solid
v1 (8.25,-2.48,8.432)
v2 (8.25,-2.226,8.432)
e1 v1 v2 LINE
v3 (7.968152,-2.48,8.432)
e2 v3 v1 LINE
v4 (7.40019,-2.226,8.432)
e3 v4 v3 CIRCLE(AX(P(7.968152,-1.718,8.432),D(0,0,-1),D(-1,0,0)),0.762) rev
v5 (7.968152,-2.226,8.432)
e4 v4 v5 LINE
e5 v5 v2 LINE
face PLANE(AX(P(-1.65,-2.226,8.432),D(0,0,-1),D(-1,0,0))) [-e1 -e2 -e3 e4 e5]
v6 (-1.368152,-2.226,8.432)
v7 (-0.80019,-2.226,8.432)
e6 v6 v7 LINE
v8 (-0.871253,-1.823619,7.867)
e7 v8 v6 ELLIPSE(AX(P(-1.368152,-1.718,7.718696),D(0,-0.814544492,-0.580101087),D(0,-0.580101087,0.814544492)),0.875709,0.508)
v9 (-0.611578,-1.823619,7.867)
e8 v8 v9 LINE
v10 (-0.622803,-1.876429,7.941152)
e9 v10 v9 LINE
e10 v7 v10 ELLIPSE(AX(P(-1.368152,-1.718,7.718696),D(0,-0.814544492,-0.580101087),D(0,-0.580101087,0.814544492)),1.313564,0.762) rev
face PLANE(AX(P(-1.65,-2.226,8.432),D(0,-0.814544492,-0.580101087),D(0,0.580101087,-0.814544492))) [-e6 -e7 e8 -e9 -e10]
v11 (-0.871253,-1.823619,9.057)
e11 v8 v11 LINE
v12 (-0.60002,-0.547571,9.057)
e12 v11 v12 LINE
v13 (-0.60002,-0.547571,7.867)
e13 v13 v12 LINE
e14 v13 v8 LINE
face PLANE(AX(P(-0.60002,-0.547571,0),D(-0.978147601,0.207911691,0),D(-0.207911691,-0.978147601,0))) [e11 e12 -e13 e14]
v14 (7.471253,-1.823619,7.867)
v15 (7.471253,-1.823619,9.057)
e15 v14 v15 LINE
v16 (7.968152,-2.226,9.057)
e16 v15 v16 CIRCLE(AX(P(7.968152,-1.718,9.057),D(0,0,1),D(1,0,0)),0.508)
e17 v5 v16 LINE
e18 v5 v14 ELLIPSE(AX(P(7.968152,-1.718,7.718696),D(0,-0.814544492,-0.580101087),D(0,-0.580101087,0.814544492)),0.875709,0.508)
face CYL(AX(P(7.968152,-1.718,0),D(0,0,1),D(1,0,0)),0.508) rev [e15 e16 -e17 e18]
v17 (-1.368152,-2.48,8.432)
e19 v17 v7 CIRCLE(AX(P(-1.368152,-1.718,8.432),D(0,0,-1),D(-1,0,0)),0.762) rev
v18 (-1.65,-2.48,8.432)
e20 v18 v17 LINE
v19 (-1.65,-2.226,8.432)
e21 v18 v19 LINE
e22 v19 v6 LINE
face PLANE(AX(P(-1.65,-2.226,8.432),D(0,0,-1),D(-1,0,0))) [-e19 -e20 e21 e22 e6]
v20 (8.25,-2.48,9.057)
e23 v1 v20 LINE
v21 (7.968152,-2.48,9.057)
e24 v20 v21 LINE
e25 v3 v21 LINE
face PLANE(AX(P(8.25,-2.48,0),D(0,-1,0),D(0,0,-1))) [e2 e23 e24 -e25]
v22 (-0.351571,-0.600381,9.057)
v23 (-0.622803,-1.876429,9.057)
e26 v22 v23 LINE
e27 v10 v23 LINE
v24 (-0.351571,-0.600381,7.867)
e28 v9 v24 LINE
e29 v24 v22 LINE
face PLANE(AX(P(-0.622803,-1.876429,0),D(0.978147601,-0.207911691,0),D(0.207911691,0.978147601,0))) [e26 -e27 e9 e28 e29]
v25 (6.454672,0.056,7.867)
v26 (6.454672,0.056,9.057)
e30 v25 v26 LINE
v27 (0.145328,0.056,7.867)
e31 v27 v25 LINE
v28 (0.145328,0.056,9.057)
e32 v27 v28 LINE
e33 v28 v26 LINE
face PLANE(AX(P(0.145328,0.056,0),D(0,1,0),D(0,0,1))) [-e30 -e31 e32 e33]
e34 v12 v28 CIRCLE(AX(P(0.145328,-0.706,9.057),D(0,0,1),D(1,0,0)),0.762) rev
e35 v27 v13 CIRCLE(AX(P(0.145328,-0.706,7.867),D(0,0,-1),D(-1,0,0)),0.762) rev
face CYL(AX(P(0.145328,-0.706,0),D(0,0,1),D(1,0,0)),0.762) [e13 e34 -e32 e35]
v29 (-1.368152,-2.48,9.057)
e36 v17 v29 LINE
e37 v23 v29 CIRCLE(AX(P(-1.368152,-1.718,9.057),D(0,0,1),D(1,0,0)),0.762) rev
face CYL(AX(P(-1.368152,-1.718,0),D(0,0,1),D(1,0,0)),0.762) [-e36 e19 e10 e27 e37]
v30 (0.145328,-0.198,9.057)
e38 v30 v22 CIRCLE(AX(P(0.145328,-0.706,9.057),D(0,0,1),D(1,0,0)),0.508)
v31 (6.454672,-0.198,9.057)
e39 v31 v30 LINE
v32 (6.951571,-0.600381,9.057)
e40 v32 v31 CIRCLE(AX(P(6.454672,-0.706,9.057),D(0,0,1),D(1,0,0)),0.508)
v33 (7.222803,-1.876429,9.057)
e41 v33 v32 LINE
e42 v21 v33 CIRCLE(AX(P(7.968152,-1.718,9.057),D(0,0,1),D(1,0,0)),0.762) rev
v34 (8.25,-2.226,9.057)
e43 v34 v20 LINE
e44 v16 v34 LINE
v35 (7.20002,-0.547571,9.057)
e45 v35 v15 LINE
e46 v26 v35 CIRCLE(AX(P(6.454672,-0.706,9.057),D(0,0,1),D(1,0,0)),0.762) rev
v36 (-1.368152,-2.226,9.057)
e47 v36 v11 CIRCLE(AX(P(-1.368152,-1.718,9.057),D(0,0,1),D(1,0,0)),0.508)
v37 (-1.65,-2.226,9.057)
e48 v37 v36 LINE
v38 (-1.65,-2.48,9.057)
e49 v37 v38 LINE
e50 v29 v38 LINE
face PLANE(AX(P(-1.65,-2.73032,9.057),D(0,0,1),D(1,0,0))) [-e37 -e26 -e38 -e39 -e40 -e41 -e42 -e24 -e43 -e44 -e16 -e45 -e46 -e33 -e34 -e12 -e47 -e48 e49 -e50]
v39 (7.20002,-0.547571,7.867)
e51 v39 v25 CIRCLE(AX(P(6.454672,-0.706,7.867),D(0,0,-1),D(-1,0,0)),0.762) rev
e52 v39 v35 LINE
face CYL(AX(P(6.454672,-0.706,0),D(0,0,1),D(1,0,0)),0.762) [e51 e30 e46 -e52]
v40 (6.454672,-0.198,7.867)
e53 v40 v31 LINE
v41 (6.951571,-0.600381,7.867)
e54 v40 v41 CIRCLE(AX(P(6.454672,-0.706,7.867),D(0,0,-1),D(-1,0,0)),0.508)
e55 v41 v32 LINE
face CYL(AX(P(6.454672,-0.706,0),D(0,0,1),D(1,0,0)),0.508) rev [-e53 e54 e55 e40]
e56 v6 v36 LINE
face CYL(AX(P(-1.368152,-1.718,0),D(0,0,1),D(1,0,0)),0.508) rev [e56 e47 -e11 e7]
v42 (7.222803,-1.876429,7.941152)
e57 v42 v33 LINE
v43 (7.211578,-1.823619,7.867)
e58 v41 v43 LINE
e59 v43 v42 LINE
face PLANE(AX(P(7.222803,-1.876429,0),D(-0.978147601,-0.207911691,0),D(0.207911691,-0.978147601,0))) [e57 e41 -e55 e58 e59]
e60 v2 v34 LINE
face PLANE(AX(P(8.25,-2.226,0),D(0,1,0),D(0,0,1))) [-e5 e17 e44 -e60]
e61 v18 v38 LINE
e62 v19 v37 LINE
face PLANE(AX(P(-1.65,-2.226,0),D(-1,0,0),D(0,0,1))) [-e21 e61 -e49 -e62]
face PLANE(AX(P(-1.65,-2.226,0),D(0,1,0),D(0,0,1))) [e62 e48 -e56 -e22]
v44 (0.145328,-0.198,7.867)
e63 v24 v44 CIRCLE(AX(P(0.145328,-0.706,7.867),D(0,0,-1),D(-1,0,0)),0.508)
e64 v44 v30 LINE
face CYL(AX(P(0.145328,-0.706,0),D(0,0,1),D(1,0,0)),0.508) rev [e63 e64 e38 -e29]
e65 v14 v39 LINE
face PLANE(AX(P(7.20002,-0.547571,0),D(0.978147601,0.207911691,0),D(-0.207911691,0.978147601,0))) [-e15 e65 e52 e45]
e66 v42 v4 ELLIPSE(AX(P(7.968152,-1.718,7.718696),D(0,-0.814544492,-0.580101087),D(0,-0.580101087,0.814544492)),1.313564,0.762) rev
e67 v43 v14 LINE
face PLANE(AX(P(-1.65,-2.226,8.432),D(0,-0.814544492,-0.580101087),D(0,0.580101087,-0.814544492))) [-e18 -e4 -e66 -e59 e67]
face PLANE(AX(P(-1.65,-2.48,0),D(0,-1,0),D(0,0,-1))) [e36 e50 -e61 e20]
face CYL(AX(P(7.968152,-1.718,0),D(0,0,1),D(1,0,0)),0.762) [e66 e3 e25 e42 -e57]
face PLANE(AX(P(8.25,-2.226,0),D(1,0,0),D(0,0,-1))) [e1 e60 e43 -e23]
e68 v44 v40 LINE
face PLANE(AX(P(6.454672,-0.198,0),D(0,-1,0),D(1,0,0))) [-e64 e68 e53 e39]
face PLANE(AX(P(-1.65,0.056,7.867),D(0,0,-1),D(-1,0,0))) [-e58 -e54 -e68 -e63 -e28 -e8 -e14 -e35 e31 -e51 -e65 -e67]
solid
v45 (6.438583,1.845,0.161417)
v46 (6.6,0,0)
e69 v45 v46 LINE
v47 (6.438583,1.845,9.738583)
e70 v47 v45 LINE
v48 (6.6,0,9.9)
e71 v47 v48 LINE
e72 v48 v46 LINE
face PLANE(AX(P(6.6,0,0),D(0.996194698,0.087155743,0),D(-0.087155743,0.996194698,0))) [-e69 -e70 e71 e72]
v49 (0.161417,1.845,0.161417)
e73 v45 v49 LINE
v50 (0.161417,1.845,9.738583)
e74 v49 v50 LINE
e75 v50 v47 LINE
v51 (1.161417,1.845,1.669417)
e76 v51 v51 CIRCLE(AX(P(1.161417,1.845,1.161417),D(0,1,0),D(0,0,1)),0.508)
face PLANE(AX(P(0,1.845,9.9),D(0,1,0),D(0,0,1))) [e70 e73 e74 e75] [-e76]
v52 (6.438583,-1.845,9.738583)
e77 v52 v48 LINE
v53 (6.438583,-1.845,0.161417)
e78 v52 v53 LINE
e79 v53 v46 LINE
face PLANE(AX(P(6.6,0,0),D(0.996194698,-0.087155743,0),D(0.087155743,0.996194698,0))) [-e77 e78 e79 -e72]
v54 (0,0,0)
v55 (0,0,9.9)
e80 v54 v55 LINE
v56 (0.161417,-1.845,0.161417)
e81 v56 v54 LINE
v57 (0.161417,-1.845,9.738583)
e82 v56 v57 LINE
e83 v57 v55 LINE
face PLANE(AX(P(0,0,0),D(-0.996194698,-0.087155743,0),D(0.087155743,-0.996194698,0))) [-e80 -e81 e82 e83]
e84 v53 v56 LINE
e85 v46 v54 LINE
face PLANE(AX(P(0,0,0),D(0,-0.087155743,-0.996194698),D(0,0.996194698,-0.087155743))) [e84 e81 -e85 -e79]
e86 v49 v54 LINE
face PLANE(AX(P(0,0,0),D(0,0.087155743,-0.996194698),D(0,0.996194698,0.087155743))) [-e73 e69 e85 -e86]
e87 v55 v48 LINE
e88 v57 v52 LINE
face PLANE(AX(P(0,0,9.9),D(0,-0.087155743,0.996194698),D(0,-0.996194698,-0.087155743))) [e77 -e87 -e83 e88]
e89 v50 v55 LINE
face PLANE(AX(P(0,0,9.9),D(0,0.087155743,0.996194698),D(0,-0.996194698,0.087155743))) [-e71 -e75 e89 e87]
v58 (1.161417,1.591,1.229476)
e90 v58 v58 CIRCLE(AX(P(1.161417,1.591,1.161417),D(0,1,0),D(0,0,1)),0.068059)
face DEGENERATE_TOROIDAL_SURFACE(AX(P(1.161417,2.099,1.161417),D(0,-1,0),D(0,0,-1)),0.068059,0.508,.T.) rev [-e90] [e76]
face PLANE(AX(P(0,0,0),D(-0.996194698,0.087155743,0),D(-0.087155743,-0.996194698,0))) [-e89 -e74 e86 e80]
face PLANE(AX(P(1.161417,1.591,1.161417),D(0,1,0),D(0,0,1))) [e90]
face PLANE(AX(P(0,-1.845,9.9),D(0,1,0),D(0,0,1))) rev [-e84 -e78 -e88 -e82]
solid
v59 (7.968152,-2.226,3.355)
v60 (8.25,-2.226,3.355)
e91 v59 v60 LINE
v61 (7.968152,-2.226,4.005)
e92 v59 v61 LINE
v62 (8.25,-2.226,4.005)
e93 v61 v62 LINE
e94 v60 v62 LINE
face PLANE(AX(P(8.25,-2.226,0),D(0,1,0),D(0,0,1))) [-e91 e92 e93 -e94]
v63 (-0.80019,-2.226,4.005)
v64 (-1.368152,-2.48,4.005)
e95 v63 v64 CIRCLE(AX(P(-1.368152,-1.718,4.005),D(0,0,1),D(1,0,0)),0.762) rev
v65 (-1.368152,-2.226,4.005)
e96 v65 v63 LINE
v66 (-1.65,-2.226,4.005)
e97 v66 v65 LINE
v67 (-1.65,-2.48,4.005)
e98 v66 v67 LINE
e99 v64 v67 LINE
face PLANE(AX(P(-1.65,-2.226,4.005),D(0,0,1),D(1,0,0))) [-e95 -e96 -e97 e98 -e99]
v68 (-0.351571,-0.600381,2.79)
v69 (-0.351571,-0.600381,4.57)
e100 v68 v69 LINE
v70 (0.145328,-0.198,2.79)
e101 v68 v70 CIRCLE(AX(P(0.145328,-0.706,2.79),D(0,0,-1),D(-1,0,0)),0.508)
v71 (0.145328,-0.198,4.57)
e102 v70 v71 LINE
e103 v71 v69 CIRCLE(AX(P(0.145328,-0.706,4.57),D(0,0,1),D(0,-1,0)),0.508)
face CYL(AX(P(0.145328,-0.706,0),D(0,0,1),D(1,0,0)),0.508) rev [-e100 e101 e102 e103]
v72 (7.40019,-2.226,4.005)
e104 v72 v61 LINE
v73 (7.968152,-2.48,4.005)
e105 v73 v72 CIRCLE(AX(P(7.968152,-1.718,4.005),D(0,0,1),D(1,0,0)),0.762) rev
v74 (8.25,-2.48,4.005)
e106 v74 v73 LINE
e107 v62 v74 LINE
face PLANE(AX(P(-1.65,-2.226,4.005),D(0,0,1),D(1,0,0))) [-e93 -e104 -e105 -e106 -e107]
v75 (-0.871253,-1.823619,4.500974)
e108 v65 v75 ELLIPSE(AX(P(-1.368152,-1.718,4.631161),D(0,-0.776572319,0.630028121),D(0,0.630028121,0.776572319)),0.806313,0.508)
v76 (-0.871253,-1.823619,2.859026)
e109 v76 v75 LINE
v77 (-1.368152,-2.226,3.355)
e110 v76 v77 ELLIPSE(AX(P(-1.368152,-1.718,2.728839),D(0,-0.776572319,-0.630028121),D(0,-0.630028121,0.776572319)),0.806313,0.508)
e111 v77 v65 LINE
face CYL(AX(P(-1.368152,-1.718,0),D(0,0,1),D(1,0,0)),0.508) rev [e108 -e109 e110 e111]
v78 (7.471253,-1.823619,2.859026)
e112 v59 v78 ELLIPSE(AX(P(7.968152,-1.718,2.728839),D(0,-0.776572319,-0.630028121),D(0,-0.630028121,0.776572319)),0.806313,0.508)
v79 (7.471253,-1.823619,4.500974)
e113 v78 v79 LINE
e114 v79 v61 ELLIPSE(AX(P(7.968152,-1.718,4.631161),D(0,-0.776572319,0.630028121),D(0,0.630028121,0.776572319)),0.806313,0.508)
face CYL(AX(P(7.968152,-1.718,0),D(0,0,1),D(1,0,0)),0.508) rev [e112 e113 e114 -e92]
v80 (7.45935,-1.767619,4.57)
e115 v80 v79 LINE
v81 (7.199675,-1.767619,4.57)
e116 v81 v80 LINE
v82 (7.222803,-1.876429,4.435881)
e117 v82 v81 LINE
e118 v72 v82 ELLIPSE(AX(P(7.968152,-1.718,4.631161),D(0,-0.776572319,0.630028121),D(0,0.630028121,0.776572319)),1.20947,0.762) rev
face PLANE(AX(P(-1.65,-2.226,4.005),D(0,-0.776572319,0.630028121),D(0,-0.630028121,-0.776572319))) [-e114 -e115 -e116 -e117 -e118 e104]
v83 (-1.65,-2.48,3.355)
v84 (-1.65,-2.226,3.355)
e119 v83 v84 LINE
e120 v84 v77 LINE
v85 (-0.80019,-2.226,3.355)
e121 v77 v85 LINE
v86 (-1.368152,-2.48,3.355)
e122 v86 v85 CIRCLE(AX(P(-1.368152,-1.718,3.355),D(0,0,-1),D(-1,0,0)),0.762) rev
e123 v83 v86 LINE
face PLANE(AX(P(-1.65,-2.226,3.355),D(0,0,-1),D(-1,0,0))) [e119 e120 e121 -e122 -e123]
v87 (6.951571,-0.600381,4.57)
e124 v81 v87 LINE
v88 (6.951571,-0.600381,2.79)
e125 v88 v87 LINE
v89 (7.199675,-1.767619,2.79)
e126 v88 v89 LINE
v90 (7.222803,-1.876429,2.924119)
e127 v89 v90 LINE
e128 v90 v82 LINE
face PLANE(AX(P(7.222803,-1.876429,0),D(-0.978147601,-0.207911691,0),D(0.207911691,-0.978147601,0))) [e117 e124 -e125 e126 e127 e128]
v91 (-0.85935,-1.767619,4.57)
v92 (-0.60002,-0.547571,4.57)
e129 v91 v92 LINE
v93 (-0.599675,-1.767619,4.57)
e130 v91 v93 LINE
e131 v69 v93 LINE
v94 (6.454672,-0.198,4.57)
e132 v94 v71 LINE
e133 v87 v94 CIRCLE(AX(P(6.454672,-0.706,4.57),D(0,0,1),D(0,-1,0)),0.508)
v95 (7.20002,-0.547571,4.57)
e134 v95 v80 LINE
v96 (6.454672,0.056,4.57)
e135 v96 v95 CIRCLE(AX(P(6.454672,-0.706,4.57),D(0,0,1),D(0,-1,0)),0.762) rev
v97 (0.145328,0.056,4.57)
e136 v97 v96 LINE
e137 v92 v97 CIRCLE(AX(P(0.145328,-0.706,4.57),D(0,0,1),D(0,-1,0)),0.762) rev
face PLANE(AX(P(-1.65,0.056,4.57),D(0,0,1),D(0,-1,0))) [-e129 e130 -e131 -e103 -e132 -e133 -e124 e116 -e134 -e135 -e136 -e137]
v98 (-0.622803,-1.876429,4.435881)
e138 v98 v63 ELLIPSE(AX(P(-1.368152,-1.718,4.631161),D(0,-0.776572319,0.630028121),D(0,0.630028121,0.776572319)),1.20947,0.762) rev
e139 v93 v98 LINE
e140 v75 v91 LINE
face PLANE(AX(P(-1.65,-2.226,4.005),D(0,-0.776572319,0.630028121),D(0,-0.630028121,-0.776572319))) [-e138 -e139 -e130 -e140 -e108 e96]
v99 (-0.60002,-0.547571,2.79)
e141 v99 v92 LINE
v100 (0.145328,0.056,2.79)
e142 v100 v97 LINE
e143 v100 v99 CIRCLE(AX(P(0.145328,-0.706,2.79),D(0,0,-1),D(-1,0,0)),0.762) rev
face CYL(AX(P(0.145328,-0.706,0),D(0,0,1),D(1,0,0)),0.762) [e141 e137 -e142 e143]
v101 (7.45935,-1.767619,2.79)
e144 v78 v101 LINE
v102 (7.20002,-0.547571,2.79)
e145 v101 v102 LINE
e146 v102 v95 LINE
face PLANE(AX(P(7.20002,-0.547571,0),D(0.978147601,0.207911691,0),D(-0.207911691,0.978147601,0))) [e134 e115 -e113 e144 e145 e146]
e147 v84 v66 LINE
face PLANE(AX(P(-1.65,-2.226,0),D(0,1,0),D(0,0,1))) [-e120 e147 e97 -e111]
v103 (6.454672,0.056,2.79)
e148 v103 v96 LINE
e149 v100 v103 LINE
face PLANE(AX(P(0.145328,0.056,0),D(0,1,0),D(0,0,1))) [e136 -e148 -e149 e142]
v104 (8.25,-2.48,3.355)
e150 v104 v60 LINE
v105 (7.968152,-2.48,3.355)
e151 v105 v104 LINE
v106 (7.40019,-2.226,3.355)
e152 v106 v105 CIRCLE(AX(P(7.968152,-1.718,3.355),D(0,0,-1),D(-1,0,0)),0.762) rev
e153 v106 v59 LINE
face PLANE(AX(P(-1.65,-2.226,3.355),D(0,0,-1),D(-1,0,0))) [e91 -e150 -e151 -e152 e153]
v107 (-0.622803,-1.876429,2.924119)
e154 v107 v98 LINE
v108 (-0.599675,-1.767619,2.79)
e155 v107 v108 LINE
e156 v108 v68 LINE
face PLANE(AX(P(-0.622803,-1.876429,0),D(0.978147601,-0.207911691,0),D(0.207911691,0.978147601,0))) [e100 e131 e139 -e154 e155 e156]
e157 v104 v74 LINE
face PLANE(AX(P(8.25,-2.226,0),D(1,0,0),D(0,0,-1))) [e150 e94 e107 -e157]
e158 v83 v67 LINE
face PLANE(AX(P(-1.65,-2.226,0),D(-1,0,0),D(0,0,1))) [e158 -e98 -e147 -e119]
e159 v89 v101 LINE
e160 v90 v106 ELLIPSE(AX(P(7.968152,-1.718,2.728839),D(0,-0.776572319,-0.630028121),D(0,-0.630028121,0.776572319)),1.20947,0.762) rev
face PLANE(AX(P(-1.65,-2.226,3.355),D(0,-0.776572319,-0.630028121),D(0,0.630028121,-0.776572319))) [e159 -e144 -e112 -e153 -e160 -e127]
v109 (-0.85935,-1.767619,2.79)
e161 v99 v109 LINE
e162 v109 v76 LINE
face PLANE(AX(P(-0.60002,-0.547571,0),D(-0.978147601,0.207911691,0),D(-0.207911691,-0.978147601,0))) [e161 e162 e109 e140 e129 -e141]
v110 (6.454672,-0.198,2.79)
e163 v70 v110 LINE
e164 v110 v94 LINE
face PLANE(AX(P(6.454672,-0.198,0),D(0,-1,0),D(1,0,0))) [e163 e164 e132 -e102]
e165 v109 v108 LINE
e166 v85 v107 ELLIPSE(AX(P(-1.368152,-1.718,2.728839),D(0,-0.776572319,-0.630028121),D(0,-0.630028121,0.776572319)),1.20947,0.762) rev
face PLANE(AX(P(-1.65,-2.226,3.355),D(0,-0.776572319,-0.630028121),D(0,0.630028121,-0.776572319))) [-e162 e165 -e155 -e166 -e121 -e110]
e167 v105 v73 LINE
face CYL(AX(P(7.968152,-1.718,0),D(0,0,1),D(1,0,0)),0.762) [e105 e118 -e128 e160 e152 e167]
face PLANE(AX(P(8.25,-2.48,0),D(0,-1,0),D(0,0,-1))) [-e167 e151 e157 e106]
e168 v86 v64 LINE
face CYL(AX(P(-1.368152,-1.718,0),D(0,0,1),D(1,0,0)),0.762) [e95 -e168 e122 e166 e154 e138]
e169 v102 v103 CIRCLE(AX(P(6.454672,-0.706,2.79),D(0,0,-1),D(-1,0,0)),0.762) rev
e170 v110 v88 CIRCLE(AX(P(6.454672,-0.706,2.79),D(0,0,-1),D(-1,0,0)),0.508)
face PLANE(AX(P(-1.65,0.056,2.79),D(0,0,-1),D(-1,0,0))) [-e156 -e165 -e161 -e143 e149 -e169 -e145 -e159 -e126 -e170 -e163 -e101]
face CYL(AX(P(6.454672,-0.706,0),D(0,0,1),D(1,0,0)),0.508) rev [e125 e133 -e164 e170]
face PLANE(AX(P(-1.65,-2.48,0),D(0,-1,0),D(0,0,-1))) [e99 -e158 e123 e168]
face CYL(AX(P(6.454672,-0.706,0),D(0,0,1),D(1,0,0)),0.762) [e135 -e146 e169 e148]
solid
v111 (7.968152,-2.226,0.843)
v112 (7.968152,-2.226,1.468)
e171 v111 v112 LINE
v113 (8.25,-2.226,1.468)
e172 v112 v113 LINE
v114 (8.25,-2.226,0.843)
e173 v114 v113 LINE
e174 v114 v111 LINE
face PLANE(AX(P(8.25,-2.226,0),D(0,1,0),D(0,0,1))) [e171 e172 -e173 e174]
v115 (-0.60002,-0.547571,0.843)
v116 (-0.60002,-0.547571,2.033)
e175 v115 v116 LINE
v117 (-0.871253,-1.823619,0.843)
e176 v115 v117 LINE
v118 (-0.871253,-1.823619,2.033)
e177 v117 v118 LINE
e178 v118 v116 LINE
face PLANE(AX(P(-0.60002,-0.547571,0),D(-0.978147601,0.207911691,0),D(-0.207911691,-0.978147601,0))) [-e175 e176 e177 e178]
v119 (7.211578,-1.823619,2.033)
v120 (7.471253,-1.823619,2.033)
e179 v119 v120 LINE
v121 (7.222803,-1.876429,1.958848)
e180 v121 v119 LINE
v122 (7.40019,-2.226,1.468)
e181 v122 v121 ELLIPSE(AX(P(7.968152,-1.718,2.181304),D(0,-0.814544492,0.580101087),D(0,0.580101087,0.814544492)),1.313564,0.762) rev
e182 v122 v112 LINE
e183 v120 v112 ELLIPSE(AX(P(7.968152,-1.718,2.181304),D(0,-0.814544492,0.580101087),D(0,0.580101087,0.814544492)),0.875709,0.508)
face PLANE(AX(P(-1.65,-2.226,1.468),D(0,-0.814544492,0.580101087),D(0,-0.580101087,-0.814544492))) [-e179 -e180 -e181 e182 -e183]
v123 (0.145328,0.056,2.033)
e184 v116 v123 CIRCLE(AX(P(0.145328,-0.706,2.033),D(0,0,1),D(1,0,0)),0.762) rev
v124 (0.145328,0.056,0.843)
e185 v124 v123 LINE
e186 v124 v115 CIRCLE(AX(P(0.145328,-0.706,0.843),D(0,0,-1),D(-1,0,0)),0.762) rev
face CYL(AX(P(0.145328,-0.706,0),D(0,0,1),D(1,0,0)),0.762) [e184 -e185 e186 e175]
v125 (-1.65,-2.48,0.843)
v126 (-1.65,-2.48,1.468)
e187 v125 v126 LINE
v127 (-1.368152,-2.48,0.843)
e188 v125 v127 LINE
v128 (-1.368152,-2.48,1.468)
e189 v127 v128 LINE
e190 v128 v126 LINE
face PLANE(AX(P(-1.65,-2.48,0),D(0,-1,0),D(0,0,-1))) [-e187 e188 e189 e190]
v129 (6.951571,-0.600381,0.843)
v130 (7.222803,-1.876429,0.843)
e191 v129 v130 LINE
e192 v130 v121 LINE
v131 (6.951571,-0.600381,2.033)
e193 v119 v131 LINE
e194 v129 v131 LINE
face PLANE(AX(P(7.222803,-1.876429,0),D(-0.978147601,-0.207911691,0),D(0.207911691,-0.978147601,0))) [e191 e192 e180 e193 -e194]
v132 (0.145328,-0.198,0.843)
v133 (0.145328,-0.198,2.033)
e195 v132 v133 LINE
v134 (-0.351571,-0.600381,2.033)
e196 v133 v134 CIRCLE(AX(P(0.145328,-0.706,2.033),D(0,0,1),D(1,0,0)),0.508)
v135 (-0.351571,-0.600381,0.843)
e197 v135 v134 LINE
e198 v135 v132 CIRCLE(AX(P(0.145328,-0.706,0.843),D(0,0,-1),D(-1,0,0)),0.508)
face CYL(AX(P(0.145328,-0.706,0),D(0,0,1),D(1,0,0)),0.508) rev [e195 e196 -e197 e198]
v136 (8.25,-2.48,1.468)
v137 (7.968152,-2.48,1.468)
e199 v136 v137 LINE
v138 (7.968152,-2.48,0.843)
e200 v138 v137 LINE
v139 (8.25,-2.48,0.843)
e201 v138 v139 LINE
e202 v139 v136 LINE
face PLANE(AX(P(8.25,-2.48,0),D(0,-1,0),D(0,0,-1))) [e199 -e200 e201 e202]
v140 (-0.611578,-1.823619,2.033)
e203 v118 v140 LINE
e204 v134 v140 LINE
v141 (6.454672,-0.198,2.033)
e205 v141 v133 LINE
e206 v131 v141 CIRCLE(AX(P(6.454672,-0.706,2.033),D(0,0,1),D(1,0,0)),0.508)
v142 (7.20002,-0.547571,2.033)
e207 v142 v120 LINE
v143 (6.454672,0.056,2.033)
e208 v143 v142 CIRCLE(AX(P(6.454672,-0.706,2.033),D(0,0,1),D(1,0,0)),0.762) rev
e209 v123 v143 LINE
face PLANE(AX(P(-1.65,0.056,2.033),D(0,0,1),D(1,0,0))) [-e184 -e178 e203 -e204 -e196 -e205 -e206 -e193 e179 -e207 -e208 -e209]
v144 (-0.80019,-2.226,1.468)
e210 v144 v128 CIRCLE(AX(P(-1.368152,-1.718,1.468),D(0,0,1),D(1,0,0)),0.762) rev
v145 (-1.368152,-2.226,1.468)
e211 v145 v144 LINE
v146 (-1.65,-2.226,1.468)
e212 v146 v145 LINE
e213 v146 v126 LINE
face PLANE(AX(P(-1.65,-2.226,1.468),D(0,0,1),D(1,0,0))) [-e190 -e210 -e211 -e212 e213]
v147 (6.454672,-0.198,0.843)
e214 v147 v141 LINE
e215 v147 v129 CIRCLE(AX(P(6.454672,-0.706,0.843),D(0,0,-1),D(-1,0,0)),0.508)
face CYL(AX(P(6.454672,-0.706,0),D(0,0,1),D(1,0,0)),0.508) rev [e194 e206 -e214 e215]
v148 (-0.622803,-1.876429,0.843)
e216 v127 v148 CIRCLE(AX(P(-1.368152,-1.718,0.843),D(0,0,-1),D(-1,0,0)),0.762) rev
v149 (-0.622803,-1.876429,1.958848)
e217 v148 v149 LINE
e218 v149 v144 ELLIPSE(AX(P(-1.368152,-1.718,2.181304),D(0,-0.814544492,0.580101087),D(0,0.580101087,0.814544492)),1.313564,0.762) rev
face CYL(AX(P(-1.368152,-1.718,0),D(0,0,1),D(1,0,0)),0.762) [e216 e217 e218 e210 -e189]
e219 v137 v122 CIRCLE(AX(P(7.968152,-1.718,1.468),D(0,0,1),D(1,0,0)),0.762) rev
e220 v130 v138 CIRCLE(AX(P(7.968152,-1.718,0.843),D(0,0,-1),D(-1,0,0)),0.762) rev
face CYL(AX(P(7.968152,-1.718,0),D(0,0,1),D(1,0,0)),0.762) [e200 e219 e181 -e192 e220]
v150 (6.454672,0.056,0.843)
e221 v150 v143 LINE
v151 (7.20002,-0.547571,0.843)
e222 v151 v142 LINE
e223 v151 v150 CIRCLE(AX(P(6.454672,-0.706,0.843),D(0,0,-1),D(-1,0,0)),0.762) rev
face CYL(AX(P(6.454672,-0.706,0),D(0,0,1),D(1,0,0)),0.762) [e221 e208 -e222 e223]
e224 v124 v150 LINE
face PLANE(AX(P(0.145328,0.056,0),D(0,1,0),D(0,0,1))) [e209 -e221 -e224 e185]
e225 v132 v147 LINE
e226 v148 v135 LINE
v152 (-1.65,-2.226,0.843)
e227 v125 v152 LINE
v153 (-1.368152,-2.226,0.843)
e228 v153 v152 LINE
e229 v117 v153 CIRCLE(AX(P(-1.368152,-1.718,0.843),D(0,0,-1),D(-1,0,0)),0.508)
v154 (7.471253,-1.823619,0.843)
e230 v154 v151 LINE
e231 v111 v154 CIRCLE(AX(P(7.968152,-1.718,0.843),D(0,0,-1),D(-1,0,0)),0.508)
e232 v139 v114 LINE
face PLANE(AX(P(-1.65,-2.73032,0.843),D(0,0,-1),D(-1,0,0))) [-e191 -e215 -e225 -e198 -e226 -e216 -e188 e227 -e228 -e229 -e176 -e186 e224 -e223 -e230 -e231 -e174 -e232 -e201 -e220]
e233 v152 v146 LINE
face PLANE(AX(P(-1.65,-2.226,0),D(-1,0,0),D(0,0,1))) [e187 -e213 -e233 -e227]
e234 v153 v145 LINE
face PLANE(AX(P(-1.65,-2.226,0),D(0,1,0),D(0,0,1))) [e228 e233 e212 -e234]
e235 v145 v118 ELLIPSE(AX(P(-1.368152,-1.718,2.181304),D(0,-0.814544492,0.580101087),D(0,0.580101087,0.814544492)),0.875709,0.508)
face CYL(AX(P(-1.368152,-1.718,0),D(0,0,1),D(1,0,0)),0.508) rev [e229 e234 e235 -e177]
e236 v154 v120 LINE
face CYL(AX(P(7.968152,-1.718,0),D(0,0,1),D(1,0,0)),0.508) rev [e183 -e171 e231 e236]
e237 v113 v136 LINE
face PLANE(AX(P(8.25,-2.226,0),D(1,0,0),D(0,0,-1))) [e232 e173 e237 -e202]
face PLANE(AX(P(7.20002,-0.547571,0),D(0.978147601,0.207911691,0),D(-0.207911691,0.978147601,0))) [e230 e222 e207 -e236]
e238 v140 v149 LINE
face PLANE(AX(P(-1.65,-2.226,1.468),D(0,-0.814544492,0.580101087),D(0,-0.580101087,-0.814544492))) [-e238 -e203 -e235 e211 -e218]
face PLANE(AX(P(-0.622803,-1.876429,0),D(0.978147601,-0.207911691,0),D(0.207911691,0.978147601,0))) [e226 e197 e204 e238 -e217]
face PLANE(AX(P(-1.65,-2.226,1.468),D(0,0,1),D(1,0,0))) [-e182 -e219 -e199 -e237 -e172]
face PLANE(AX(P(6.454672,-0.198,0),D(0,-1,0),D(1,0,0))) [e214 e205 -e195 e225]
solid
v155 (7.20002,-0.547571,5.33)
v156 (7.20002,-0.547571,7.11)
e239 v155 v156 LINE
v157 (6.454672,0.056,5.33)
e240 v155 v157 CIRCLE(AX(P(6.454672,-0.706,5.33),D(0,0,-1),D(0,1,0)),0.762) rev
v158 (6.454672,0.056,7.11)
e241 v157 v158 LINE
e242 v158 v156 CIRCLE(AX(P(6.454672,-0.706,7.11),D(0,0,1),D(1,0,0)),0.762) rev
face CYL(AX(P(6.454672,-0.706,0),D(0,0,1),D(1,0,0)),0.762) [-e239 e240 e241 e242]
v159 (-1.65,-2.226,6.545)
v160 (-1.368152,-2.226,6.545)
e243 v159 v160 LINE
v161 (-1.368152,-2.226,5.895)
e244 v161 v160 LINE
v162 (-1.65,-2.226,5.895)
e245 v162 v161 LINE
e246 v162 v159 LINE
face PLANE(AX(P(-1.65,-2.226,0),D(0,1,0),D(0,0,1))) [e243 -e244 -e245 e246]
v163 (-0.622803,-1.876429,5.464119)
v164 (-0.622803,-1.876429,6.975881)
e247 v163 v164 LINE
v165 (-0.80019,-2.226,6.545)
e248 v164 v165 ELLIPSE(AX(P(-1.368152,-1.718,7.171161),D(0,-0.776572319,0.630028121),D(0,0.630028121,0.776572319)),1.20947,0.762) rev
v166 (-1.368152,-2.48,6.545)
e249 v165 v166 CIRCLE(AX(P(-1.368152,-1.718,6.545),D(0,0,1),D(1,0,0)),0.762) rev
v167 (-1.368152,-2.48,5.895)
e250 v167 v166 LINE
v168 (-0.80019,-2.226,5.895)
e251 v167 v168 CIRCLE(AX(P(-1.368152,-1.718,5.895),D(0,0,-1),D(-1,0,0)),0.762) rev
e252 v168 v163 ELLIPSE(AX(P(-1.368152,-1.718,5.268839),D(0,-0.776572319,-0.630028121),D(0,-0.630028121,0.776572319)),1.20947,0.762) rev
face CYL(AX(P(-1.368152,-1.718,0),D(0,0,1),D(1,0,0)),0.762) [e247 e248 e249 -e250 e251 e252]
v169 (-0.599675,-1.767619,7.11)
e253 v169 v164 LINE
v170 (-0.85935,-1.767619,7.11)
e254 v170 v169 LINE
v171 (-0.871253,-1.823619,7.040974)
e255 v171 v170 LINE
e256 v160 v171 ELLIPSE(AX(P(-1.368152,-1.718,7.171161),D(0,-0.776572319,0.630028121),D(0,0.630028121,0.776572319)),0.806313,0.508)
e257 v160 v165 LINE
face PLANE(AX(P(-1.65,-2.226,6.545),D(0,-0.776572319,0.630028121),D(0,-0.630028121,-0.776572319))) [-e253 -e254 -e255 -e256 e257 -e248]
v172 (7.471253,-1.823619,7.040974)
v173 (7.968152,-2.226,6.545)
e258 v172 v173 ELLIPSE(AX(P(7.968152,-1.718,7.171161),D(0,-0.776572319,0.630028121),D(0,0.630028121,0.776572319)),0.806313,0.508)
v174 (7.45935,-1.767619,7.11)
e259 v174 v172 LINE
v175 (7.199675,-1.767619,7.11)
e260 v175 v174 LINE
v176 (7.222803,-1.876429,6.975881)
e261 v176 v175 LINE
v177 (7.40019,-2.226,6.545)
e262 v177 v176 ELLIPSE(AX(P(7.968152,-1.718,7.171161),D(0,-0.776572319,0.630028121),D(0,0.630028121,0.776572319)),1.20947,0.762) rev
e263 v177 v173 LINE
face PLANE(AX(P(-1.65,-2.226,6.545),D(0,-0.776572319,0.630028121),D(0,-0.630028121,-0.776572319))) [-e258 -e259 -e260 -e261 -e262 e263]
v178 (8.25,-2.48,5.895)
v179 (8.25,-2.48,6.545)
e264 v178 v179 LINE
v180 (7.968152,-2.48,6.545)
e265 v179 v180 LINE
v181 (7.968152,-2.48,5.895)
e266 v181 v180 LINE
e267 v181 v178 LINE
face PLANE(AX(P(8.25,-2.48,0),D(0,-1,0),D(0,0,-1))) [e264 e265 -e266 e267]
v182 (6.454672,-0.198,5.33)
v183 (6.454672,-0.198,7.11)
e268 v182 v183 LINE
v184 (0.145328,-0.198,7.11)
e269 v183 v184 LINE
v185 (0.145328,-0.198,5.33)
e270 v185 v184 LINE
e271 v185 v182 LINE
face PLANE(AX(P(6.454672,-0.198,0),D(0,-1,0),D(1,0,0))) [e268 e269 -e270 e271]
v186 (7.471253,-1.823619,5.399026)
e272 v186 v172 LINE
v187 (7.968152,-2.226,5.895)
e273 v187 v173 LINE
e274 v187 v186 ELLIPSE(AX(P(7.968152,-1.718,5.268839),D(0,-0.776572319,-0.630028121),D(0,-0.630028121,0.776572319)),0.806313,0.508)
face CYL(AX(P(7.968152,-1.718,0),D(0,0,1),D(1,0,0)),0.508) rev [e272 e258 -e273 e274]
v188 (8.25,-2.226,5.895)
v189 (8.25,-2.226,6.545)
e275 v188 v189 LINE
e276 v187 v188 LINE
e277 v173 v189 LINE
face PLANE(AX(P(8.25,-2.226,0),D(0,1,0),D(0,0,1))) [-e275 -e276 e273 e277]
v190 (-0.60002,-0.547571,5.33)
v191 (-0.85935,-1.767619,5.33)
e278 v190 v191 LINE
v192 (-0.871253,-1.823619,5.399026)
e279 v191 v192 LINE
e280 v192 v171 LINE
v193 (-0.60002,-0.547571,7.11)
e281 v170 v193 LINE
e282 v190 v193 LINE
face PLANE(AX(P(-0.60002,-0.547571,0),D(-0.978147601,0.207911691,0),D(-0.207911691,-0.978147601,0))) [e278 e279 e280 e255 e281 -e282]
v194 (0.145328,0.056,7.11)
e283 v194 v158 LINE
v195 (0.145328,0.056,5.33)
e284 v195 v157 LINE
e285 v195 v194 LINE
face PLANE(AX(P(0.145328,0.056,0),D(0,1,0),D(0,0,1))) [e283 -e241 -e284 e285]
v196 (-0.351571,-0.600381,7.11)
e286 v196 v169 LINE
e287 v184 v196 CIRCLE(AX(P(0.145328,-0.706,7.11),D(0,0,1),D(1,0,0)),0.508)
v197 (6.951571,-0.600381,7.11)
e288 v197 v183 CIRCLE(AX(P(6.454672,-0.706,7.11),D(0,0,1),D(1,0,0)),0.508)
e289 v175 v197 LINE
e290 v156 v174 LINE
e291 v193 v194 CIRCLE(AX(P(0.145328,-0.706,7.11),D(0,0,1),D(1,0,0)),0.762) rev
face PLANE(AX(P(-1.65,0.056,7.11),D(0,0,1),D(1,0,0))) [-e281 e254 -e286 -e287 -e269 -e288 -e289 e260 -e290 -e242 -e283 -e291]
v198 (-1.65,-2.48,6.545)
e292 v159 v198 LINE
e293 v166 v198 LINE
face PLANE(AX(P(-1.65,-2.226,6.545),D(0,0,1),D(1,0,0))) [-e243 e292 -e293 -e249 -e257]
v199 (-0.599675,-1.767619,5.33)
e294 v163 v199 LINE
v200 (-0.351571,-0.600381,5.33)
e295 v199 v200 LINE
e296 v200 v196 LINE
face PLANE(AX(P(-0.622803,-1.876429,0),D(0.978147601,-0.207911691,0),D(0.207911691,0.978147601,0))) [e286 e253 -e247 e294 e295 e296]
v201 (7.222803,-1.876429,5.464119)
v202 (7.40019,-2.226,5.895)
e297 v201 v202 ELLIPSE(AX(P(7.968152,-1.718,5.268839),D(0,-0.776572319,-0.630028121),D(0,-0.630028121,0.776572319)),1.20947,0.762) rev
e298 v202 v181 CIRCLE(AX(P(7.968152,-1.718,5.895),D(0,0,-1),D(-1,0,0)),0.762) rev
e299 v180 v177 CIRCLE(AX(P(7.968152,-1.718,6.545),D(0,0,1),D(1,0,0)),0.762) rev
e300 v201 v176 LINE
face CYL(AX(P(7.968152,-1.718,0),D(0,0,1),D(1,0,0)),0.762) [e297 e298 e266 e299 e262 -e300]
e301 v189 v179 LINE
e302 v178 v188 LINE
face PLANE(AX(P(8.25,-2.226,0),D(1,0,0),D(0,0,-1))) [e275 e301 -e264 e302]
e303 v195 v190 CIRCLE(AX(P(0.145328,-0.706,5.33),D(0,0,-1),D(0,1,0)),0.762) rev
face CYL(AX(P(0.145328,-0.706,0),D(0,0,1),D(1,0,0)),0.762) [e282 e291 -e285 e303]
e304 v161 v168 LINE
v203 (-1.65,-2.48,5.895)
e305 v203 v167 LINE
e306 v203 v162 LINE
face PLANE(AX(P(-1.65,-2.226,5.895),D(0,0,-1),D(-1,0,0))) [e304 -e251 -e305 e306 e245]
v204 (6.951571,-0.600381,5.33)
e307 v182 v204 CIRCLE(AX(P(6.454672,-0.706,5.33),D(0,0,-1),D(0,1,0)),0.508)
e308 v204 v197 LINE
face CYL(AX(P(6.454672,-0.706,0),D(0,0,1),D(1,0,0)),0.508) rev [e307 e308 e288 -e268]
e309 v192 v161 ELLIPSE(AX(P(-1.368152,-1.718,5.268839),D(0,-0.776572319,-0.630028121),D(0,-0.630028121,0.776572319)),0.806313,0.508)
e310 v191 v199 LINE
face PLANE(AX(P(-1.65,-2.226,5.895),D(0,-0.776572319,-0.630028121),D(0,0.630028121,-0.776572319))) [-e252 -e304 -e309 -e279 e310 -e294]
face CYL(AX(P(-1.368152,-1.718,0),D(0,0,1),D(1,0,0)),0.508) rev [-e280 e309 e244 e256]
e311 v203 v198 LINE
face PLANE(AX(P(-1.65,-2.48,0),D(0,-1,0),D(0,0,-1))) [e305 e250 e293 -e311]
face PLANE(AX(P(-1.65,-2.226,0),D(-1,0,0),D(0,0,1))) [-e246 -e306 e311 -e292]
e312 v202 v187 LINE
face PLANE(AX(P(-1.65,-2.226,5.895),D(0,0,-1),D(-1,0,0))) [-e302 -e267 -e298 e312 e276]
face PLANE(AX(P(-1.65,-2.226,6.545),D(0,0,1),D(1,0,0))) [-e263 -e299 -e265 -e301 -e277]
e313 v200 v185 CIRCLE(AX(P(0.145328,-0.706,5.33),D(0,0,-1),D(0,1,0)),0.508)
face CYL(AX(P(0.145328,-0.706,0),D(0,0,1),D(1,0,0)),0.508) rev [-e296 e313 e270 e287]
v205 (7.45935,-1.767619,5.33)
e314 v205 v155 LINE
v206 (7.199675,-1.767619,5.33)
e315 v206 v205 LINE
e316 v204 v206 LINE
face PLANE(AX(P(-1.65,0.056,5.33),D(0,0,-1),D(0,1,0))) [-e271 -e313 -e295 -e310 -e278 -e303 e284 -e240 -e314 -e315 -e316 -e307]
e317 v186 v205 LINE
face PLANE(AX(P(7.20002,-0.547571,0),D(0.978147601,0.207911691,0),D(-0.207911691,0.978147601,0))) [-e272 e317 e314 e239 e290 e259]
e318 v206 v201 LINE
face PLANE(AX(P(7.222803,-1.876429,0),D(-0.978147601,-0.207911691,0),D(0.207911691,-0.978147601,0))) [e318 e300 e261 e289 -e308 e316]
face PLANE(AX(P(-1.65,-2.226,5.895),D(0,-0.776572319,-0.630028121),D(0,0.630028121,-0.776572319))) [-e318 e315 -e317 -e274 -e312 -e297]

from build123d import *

# Parameters (mm, degrees)
SKETCH1_W                = 6.6
SKETCH1_H                = 9.9
EXTRUDE1_DEPTH           = 1.845
EXTRUDE1_TAPER           = 5
EXTRUDE1_OTHER_WAY_DEPTH = 1.845
EXTRUDE1_OTHER_WAY_TAPER = 5
EXTRUDE2_DEPTH           = 9.9
SKETCH4_W                = 14.472688398
SKETCH4_H                = 13.698747843
CUT_EXTRUDE1_DEPTH       = 15.218663861
SKETCH7_R                = 0.508
CUT_EXTRUDE4_DEPTH       = 0.254
FILLET1_R                = 0.508


with BuildPart() as part:
    # Sketch1 → Extrude1 (new body)
    with BuildSketch(Plane(origin=(0, 0, 0), x_dir=(1, 0, 0), z_dir=(0, 1, 0))):
        with Locations((3.3, -4.95)):
            Rectangle(SKETCH1_W, SKETCH1_H)
    extrude(amount=-EXTRUDE1_DEPTH, taper=EXTRUDE1_TAPER)

    # Sketch1 → Extrude1 other way (add)
    with BuildSketch(Plane(origin=(0, 0, 0), x_dir=(1, 0, 0), z_dir=(0, 1, 0))):
        with Locations((3.3, -4.95)):
            Rectangle(SKETCH1_W, SKETCH1_H)
    extrude(amount=EXTRUDE1_OTHER_WAY_DEPTH, taper=EXTRUDE1_OTHER_WAY_TAPER)

    # Sketch7 → Cut-Extrude4 (cut)
    with BuildSketch(Plane(origin=(0, 1.845, 0), x_dir=(1, 0, 0), z_dir=(0, 1, 0))):
        with Locations(Location((1.161416584, -1.161416584, 0), (0, 0, 270))):
            Circle(SKETCH7_R)
    extrude(amount=-CUT_EXTRUDE4_DEPTH, mode=Mode.SUBTRACT)

    # Fillet1
    # the kernel refuses this fillet: 0.508 mm, written as the material it adds along each edge
    with BuildSketch(Plane(origin=(1.161416584, 1.591, 1.161416584), x_dir=(0, 0, 1), z_dir=(-1, 0, 0))) as fillet1_piece_1:
        with BuildLine():
            CenterArc((0.068059095, 0.508), FILLET1_R, 270, 60)
            Line((0.068059095, 0), (0.068059095, -0.01016))
            Line((0.068059095, -0.01016), (0.508, -0.01016))
            Line((0.508, -0.01016), (0.51816, 0))
            ThreePointArc((0.51816, 0), (0.51816, 0.127), (0.516798818, 0.24892))
            Line((0.516798818, 0.24892), (0.508, 0.254))
        make_face()
    revolve(axis=Axis((1.161416584, 1.591, 1.161416584), (0, 1, 0)))


with BuildPart() as body_2:
    # Sketch2 → Extrude2 (new body)
    with BuildSketch(Plane(origin=(0, -0.430598518, 0), x_dir=(1, 0, 0), z_dir=(0, 0, 1))):
        with BuildLine():
            Line((0.145328065, 0.486598518), (6.454671935, 0.486598518))
            ThreePointArc((6.454671935, 0.486598518), (6.934214073, 0.316783741), (7.200020406, -0.116972773))
            Line((7.200020406, -0.116972773), (7.471252749, -1.393020621))
            ThreePointArc((7.471252749, -1.393020621), (7.648456972, -1.68219163), (7.968151731, -1.795401482))
            Line((7.968151731, -1.795401482), (8.25, -1.795401482))
            Line((8.25, -1.795401482), (8.25, -2.049401482))
            Line((8.25, -2.049401482), (7.968151731, -2.049401482))
            ThreePointArc((7.968151731, -2.049401482), (7.488609593, -1.879586704), (7.222803259, -1.44583019))
            Line((7.222803259, -1.44583019), (6.951570916, -0.169782343))
            ThreePointArc((6.951570916, -0.169782343), (6.774366693, 0.119388667), (6.454671935, 0.232598518))
            Line((6.454671935, 0.232598518), (0.145328065, 0.232598518))
            ThreePointArc((0.145328065, 0.232598518), (-0.174366693, 0.119388667), (-0.351570916, -0.169782343))
            Line((-0.351570916, -0.169782343), (-0.622803259, -1.44583019))
            ThreePointArc((-0.622803259, -1.44583019), (-0.888609593, -1.879586704), (-1.368151731, -2.049401482))
            Line((-1.368151731, -2.049401482), (-1.65, -2.049401482))
            Line((-1.65, -2.049401482), (-1.65, -1.795401482))
            Line((-1.65, -1.795401482), (-1.368151731, -1.795401482))
            ThreePointArc((-1.368151731, -1.795401482), (-1.048456972, -1.68219163), (-0.871252749, -1.393020621))
            Line((-0.871252749, -1.393020621), (-0.600020406, -0.116972773))
            ThreePointArc((-0.600020406, -0.116972773), (-0.334214073, 0.316783741), (0.145328065, 0.486598518))
        make_face()
    extrude(amount=EXTRUDE2_DEPTH)

    # Sketch4 → Cut-Extrude1 (cut, through all)
    with BuildSketch(Plane(origin=(8.25, 0, 0), x_dir=(0, 0, -1), z_dir=(1, 0, 0))):
        with Locations((-5.252892173, -2.360806544)):
            Rectangle(SKETCH4_W, SKETCH4_H)
        Polygon((-7.11, 0.056), (-5.33, 0.056), (-5.33, -1.767619139), (-5.895, -2.226), (-5.895, -2.730319947), (-6.545, -2.730319947), (-6.545, -2.226), (-7.11, -1.767619139), align=None, mode=Mode.SUBTRACT)
        Polygon((-4.005, -2.226), (-4.57, -1.767619139), (-4.57, 0.056), (-2.79, 0.056), (-2.79, -1.767619139), (-3.355, -2.226), (-3.355, -2.730319947), (-4.005, -2.730319947), align=None, mode=Mode.SUBTRACT)
        Polygon((-0.843, -2.730319947), (-0.843, 0.056), (-2.033, 0.056), (-2.033, -1.823619139), (-1.468, -2.226), (-1.468, -2.730319947), align=None, mode=Mode.SUBTRACT)
        Polygon((-9.057, 0.056), (-7.867, 0.056), (-7.867, -1.823619139), (-8.432, -2.226), (-8.432, -2.730319947), (-9.057, -2.730319947), align=None, mode=Mode.SUBTRACT)
    extrude(amount=-CUT_EXTRUDE1_DEPTH, mode=Mode.SUBTRACT)


with BuildPart() as cut_extrude1_piece_1:
    # of the separate pieces the step leaves, piece 1, a body of its own (cut_extrude1_pieces)
    add(body_2.part.solids().sort_by_distance((-1.368151731, -2.226, 5.895))[0])


with BuildPart() as cut_extrude1_piece_2:
    # of the separate pieces the step leaves, piece 2, a body of its own (cut_extrude1_pieces)
    add(body_2.part.solids().sort_by_distance((-1.368151731, -2.226, 3.355))[0])


with BuildPart() as cut_extrude1_piece_3:
    # of the separate pieces the step leaves, piece 3, a body of its own (cut_extrude1_pieces)
    add(body_2.part.solids().sort_by_distance((-1.368151731, -2.226, 0.843))[0])


with BuildPart() as cut_extrude1_piece_4:
    # of the separate pieces the step leaves, piece 4, a body of its own (cut_extrude1_pieces)
    add(body_2.part.solids().sort_by_distance((-1.368151731, -2.226, 8.432))[0])


solid = Compound([part.part, cut_extrude1_piece_1.part, cut_extrude1_piece_2.part, cut_extrude1_piece_3.part, cut_extrude1_piece_4.part])
